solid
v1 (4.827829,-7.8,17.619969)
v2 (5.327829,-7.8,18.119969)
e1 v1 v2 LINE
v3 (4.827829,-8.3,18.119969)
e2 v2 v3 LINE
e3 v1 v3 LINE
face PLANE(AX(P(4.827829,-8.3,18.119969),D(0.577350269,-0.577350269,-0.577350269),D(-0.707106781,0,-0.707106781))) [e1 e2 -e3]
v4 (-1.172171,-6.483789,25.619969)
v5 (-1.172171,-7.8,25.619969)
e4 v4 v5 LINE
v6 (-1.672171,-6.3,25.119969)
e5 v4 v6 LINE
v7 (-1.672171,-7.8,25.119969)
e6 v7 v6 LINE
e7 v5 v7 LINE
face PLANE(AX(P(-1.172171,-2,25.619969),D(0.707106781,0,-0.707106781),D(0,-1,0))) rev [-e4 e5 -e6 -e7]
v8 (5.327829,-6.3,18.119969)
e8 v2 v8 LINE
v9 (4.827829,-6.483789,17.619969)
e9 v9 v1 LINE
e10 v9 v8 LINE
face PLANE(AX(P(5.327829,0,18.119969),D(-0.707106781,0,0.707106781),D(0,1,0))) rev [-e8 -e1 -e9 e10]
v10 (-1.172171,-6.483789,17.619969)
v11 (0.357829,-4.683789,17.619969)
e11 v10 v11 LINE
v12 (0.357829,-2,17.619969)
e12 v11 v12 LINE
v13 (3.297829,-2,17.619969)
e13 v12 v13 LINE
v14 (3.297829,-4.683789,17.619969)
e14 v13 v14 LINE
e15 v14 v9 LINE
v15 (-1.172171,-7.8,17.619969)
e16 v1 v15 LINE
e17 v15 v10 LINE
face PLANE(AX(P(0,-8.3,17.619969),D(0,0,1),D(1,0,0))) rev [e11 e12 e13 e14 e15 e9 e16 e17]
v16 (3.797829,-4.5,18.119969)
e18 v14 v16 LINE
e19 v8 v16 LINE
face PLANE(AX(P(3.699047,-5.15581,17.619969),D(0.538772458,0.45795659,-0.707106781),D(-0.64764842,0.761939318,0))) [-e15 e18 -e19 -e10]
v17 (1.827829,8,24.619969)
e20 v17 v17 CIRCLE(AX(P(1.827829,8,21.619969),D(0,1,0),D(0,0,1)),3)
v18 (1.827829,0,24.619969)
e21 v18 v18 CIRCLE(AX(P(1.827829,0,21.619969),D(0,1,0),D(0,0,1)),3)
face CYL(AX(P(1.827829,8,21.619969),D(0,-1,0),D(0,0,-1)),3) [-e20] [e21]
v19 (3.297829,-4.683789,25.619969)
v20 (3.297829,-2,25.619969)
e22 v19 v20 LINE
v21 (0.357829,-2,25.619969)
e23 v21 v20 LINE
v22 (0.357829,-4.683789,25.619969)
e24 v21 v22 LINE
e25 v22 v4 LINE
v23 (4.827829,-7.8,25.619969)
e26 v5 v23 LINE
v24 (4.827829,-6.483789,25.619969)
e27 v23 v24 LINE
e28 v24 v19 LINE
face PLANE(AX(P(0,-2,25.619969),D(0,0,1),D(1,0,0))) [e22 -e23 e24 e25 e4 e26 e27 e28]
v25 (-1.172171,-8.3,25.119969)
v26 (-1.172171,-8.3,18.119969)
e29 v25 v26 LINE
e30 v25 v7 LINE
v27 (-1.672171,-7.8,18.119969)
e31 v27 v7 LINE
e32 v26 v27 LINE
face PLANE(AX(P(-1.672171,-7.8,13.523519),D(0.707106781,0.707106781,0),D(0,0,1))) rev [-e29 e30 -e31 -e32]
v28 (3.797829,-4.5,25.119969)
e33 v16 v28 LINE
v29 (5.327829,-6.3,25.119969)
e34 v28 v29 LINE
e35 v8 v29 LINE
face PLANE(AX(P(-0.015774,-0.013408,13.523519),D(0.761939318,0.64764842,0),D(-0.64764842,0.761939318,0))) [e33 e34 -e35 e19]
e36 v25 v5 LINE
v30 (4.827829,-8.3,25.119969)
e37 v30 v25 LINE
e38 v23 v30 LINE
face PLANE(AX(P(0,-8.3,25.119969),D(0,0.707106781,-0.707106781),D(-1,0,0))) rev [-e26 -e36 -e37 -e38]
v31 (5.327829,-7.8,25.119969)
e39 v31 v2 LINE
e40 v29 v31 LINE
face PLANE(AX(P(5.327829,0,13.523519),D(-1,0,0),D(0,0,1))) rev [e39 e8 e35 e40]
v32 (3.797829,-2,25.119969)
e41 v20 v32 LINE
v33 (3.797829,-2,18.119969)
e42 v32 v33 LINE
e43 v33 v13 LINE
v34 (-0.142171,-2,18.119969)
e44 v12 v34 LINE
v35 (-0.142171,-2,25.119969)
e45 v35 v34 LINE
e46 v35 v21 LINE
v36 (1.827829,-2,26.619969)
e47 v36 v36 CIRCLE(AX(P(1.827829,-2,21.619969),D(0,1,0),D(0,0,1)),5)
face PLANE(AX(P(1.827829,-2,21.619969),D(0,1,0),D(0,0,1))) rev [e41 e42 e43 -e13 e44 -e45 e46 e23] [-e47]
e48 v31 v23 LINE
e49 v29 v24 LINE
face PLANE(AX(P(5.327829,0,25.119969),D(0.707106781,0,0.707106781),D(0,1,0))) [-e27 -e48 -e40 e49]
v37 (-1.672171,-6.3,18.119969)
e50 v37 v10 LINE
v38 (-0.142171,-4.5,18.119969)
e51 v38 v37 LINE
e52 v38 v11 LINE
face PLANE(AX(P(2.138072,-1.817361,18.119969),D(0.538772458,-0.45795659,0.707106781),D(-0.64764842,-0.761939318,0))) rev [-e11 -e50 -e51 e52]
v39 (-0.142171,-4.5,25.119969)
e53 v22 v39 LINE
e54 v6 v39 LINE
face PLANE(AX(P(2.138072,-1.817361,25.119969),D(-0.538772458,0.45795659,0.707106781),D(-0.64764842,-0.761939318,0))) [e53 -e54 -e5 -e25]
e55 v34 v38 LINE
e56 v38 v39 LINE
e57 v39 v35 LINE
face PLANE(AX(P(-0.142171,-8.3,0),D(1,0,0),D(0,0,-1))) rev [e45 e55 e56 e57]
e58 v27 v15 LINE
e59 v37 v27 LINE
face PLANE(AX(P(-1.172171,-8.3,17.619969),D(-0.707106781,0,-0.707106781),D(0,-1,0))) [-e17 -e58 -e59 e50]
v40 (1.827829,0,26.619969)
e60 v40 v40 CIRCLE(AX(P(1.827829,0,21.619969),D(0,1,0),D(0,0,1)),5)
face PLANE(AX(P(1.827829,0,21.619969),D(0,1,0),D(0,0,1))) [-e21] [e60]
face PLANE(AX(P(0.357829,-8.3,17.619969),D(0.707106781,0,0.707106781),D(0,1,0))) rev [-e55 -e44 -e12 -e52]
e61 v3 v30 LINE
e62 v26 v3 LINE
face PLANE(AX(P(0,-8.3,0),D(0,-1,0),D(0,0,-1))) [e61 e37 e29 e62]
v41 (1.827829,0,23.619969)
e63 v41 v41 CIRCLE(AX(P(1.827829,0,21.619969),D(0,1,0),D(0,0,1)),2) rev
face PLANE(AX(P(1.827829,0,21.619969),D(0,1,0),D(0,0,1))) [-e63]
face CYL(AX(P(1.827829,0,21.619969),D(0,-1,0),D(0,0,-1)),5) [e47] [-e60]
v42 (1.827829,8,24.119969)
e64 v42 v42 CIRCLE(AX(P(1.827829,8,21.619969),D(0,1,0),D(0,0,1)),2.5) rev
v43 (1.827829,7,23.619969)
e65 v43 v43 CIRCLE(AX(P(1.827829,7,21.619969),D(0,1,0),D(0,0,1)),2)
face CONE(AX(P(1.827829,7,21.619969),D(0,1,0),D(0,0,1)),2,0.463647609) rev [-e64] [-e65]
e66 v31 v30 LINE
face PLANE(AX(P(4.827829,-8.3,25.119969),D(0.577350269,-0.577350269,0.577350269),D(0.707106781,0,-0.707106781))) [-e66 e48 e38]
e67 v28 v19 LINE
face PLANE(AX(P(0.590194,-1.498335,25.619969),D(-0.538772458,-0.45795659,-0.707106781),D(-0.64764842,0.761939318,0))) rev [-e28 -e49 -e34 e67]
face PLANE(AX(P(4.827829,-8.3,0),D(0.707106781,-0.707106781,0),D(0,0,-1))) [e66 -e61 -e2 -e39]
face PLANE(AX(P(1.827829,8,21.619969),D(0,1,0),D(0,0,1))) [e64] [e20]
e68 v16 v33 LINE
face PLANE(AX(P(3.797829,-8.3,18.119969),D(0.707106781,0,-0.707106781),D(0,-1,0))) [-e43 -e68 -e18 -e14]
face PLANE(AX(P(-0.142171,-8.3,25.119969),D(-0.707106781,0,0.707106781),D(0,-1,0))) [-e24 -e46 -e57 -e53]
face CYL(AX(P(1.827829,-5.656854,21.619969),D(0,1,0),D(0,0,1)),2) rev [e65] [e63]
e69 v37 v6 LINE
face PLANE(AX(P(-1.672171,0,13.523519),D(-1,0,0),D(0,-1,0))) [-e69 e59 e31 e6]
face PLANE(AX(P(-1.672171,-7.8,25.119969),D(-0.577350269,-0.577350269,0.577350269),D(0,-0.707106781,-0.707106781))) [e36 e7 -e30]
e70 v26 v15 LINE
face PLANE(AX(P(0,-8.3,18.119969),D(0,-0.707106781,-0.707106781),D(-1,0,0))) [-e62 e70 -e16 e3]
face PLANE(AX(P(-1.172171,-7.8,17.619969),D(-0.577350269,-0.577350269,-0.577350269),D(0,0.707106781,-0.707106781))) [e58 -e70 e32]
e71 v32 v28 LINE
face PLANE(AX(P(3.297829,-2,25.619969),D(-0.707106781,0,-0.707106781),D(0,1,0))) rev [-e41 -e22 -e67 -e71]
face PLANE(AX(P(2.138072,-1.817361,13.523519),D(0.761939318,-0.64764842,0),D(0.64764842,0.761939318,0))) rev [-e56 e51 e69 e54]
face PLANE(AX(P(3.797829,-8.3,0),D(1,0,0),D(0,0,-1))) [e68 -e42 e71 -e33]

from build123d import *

# Parameters (mm, degrees)
BOSS_EXTRUDE9_DEPTH      = 5.6
BOSS_EXTRUDE9_DEPTH_BACK = 2
SKETCH16_W               = 8
SKETCH16_H               = 3.5
BOSS_EXTRUDE11_DEPTH     = 8
CHAMFER2_SIZE            = 1.5
SKETCH17_W               = 3.94
SKETCH17_H               = 8
BOSS_EXTRUDE12_DEPTH     = 6.3
CUT_EXTRUDE2_START       = -5.6
CUT_EXTRUDE2_DEPTH       = 3.6
SKETCH21_R               = 1.5
BOSS_EXTRUDE14_DEPTH     = 3.6
CHAMFER4_SIZE            = 1
CUT_EXTRUDE3_DEPTH       = 3.6
SPLIT1_START             = -2
SPLIT1_DEPTH             = 7.6
SKETCH22_R               = 5
BOSS_EXTRUDE15_DEPTH     = 2
SKETCH23_R               = 3
BOSS_EXTRUDE16_DEPTH     = 8
CUT_EXTRUDE4_DEPTH       = 32.952026383
CUT_EXTRUDE4_DEPTH_BACK  = 8
SKETCH24_R               = 2
CHAMFER5_SIZE            = 0.5
CHAMFER5_SIZE2           = 1
SKETCH25_W               = 1.53
SKETCH25_H               = 2
BOSS_EXTRUDE17_DEPTH     = 8
CHAMFER6_SIZE            = 0.5


# Read off the part's stored shape, not the designer's step: Split1
with BuildPart() as part:
    # Sketch14 → Boss-Extrude9 (new, two sides: drawn at the far end of the back side and taken through both)
    with BuildSketch(Plane(origin=(0, 0, 0), x_dir=(1, 0, 0), z_dir=(0, 1, 0)).offset(-BOSS_EXTRUDE9_DEPTH_BACK)):
        with BuildLine():
            Line((-4.172171186, -20.619968889), (-4.172171186, -25.619968889))
            Line((-4.172171186, -25.619968889), (7.827828814, -25.619968889))
            Line((7.827828814, -25.619968889), (7.827828814, -20.619968889))
            ThreePointArc((7.827828814, -20.619968889), (1.827828814, -14.619968889), (-4.172171186, -20.619968889))
        make_face()
    extrude(amount=BOSS_EXTRUDE9_DEPTH + BOSS_EXTRUDE9_DEPTH_BACK)

    # Sketch16 → Boss-Extrude11 (add)
    with BuildSketch(Plane.XY.offset(25.619968889)):
        with Locations((1.827828814, 1.75)):
            Rectangle(SKETCH16_W, SKETCH16_H)
    extrude(amount=BOSS_EXTRUDE11_DEPTH)

    # Chamfer2
    chamfer2_edges = [part.edges().sort_by_distance(p)[0] for p in [
        (1.827828814, -2, 14.619968889),
        (7.827828814, 5.6, 23.119968889),
        (1.827828814, 5.6, 14.619968889),
        (-4.172171186, -2, 23.119968889),
        (-4.172171186, 5.6, 23.119968889),
        (7.827828814, -2, 23.119968889),
    ]]
    chamfer(chamfer2_edges, length=CHAMFER2_SIZE)

    # Sketch17 → Boss-Extrude12 (add)
    with BuildSketch(Plane.XZ.offset(2)):
        with Locations((1.827828814, 21.619968889)):
            Rectangle(SKETCH17_W, SKETCH17_H)
    extrude(amount=BOSS_EXTRUDE12_DEPTH)

    # Sketch20 → Cut-Extrude2 (cut)
    with BuildSketch(Plane(origin=(0, 5.6, 0), x_dir=(1, 0, 0), z_dir=(0, 1, 0)).offset(CUT_EXTRUDE2_START)):
        with BuildLine():
            Line((7.827828814, -20.619968889), (-4.172171186, -20.619968889))
            ThreePointArc((-4.172171186, -20.619968889), (1.827828814, -14.619968889), (7.827828814, -20.619968889))
        make_face()
    extrude(amount=CUT_EXTRUDE2_DEPTH, mode=Mode.SUBTRACT)

    # Sketch21 → Boss-Extrude14 (add)
    with BuildSketch(Plane(origin=(0, 0, 0), x_dir=(1, 0, 0), z_dir=(0, 1, 0))):
        with BuildLine():
            ThreePointArc((7.827828814, -20.619968889), (7.63955943, -19.128732072), (7.086566399, -17.731080001))
            ThreePointArc((7.086566399, -17.731080001), (6.279209969, -19.350325806), (4.990106474, -20.619968889))
            Line((4.990106474, -20.619968889), (7.827828814, -20.619968889))
        make_face()
        with BuildLine():
            ThreePointArc((-1.334448847, -20.619968889), (-2.623552342, -19.350325806), (-3.430908771, -17.731080001))
            ThreePointArc((-3.430908771, -17.731080001), (-3.983901803, -19.128732072), (-4.172171186, -20.619968889))
            Line((-4.172171186, -20.619968889), (-1.334448847, -20.619968889))
        make_face()
        with Locations(Location((1.827828814, -16.119968889, 0), (0, 0, 90.000763944))):
            Circle(SKETCH21_R)
    extrude(amount=BOSS_EXTRUDE14_DEPTH)

    # Chamfer4
    # the kernel refuses this chamfer: 1 mm, written as the material it adds along each edge
    with BuildSketch(Plane(origin=(1.827828814, 3.6, 16.119968889), x_dir=(-1.3333338100422289e-05, 0, -0.999999999911111), z_dir=(0.999999999911111, 0, -1.3333338100422289e-05))) as chamfer4_piece_1_section:
        Polygon((1.5, -CHAMFER4_SIZE), (1.5 + CHAMFER4_SIZE, 0), (1.5, 0), align=None)
    chamfer4_piece_1 = revolve(axis=Axis((1.827828814, 3.6, 16.119968889), (0, 1, 0)), mode=Mode.PRIVATE)
    chamfer4_piece_1 = chamfer4_piece_1 & Plane(origin=(1.827828814, 3.111670507, 20.619968889), x_dir=(1, 0, 0), z_dir=(0, -1, 0)) * Cylinder(6, 10, mode=Mode.PRIVATE)
    add(chamfer4_piece_1)
    with BuildSketch(Plane(origin=(1.827828814, 0, 16.119968889), x_dir=(-1.3333338100422289e-05, 0, -0.999999999911111), z_dir=(0.999999999911111, 0, -1.3333338100422289e-05))) as chamfer4_piece_2_section:
        Polygon((1.5 + CHAMFER4_SIZE, 0), (1.5, CHAMFER4_SIZE), (1.5, 0), align=None)
    chamfer4_piece_2 = revolve(axis=Axis((1.827828814, 0, 16.119968889), (0, 1, 0)), mode=Mode.PRIVATE)
    chamfer4_piece_2 = chamfer4_piece_2 & Plane(origin=(1.827828814, 0.488329493, 20.619968889), x_dir=(1, 0, 0), z_dir=(0, -1, 0)) * Cylinder(6, 10, mode=Mode.PRIVATE)
    add(chamfer4_piece_2)

    # Sketch21<3> → Cut-Extrude3 (cut)
    with BuildSketch(Plane(origin=(0, 0, 0), x_dir=(1, 0, 0), z_dir=(0, 1, 0))):
        with BuildLine():
            Line((4.990106474, -20.619968889), (-1.334448847, -20.619968889))
            ThreePointArc((-1.334448847, -20.619968889), (1.827828814, -21.619968889), (4.990106474, -20.619968889))
        make_face()
    extrude(amount=CUT_EXTRUDE3_DEPTH, mode=Mode.SUBTRACT)

    # Split1 outline → Split1 (cut)
    with BuildSketch(Plane(origin=(0, 0, 0), x_dir=(1, 0, 0), z_dir=(0, 1, 0)).offset(SPLIT1_START)):
        with BuildLine():
            Line((7.827828814, -25.619968889), (7.827828814, -20.619968889))
            ThreePointArc((7.827828814, -20.619968889), (1.827828814, -14.619968889), (-4.172171186, -20.619968889))
            Line((-4.172171186, -20.619968889), (-4.172171186, -25.619968889))
            Line((-4.172171186, -25.619968889), (-2.172171186, -25.619968889))
            Line((-2.172171186, -25.619968889), (-2.172171186, -33.619968889))
            Line((-2.172171186, -33.619968889), (5.827828814, -33.619968889))
            Line((5.827828814, -33.619968889), (5.827828814, -25.619968889))
            Line((5.827828814, -25.619968889), (7.827828814, -25.619968889))
        make_face()
    extrude(amount=SPLIT1_DEPTH, mode=Mode.SUBTRACT)

    # Sketch22 → Boss-Extrude15 (add)
    with BuildSketch(Plane(origin=(0, -2, 0), x_dir=(1, 0, 0), z_dir=(0, 1, 0))):
        with Locations(Location((1.827828814, -21.619968889, 0), (0, 0, 270))):
            Circle(SKETCH22_R)
    extrude(amount=BOSS_EXTRUDE15_DEPTH)

    # Sketch23 → Boss-Extrude16 (add)
    with BuildSketch(Plane(origin=(0, 0, 0), x_dir=(1, 0, 0), z_dir=(0, 1, 0))):
        with Locations(Location((1.827828814, -21.619968889, 0), (0, 0, 270))):
            Circle(SKETCH23_R)
    extrude(amount=BOSS_EXTRUDE16_DEPTH)

    # Sketch24 → Cut-Extrude4 (cut, two sides: drawn at the far end of the back side and taken through both)
    with BuildSketch(Plane(origin=(0, 8, 0), x_dir=(1, 0, 0), z_dir=(0, 1, 0)).offset(-CUT_EXTRUDE4_DEPTH_BACK)):
        with Locations(Location((1.827828814, -21.619968889, 0), (0, 0, 270))):
            Circle(SKETCH24_R)
    extrude(amount=CUT_EXTRUDE4_DEPTH + CUT_EXTRUDE4_DEPTH_BACK, mode=Mode.SUBTRACT)

    # Chamfer5
    chamfer5_edges = [part.edges().sort_by_distance(p)[0] for p in [
        (1.827828814, 8, 19.619968889),
    ]]
    chamfer5_side = [part.faces().sort_by_distance(p)[0] for p in [
        (1.827828814, 8, 18.704821703),
    ]]
    chamfer(chamfer5_edges, length=CHAMFER5_SIZE, length2=CHAMFER5_SIZE2, reference=chamfer5_side[0])

    # Sketch25 → Boss-Extrude17 (add)
    with BuildSketch(Plane.XY.offset(25.619968889)):
        Polygon((3.797828814, -4.5), (3.797828814, -6.3), (5.327828814, -6.3), align=None)
        with Locations((4.562828814, -7.3)):
            Rectangle(SKETCH25_W, SKETCH25_H)
        with Locations((-0.907171186, -7.3)):
            Rectangle(SKETCH25_W, SKETCH25_H)
        Polygon((-0.142171186, -4.5), (-1.672171186, -6.3), (-0.142171186, -6.3), align=None)
    extrude(amount=-BOSS_EXTRUDE17_DEPTH)

    # Chamfer6
    chamfer6_edges = [part.edges().sort_by_distance(p)[0] for p in [
        (3.797828814, -3.25, 17.619968889),
        (-0.142171186, -3.25, 17.619968889),
        (3.797828814, -3.25, 25.619968889),
        (-0.142171186, -3.25, 25.619968889),
        (5.327828814, -7.3, 17.619968889),
        (5.327828814, -7.3, 25.619968889),
        (5.327828814, -8.3, 21.619968889),
        (4.562828814, -5.4, 25.619968889),
        (4.562828814, -5.4, 17.619968889),
        (-1.672171186, -8.3, 21.619968889),
        (-0.907171186, -5.4, 17.619968889),
        (-0.907171186, -5.4, 25.619968889),
        (-1.672171186, -7.3, 25.619968889),
        (-1.672171186, -7.3, 17.619968889),
        (1.827828814, -8.3, 25.619968889),
        (1.827828814, -8.3, 17.619968889),
    ]]
    chamfer(chamfer6_edges, length=CHAMFER6_SIZE)


solid = part.part
